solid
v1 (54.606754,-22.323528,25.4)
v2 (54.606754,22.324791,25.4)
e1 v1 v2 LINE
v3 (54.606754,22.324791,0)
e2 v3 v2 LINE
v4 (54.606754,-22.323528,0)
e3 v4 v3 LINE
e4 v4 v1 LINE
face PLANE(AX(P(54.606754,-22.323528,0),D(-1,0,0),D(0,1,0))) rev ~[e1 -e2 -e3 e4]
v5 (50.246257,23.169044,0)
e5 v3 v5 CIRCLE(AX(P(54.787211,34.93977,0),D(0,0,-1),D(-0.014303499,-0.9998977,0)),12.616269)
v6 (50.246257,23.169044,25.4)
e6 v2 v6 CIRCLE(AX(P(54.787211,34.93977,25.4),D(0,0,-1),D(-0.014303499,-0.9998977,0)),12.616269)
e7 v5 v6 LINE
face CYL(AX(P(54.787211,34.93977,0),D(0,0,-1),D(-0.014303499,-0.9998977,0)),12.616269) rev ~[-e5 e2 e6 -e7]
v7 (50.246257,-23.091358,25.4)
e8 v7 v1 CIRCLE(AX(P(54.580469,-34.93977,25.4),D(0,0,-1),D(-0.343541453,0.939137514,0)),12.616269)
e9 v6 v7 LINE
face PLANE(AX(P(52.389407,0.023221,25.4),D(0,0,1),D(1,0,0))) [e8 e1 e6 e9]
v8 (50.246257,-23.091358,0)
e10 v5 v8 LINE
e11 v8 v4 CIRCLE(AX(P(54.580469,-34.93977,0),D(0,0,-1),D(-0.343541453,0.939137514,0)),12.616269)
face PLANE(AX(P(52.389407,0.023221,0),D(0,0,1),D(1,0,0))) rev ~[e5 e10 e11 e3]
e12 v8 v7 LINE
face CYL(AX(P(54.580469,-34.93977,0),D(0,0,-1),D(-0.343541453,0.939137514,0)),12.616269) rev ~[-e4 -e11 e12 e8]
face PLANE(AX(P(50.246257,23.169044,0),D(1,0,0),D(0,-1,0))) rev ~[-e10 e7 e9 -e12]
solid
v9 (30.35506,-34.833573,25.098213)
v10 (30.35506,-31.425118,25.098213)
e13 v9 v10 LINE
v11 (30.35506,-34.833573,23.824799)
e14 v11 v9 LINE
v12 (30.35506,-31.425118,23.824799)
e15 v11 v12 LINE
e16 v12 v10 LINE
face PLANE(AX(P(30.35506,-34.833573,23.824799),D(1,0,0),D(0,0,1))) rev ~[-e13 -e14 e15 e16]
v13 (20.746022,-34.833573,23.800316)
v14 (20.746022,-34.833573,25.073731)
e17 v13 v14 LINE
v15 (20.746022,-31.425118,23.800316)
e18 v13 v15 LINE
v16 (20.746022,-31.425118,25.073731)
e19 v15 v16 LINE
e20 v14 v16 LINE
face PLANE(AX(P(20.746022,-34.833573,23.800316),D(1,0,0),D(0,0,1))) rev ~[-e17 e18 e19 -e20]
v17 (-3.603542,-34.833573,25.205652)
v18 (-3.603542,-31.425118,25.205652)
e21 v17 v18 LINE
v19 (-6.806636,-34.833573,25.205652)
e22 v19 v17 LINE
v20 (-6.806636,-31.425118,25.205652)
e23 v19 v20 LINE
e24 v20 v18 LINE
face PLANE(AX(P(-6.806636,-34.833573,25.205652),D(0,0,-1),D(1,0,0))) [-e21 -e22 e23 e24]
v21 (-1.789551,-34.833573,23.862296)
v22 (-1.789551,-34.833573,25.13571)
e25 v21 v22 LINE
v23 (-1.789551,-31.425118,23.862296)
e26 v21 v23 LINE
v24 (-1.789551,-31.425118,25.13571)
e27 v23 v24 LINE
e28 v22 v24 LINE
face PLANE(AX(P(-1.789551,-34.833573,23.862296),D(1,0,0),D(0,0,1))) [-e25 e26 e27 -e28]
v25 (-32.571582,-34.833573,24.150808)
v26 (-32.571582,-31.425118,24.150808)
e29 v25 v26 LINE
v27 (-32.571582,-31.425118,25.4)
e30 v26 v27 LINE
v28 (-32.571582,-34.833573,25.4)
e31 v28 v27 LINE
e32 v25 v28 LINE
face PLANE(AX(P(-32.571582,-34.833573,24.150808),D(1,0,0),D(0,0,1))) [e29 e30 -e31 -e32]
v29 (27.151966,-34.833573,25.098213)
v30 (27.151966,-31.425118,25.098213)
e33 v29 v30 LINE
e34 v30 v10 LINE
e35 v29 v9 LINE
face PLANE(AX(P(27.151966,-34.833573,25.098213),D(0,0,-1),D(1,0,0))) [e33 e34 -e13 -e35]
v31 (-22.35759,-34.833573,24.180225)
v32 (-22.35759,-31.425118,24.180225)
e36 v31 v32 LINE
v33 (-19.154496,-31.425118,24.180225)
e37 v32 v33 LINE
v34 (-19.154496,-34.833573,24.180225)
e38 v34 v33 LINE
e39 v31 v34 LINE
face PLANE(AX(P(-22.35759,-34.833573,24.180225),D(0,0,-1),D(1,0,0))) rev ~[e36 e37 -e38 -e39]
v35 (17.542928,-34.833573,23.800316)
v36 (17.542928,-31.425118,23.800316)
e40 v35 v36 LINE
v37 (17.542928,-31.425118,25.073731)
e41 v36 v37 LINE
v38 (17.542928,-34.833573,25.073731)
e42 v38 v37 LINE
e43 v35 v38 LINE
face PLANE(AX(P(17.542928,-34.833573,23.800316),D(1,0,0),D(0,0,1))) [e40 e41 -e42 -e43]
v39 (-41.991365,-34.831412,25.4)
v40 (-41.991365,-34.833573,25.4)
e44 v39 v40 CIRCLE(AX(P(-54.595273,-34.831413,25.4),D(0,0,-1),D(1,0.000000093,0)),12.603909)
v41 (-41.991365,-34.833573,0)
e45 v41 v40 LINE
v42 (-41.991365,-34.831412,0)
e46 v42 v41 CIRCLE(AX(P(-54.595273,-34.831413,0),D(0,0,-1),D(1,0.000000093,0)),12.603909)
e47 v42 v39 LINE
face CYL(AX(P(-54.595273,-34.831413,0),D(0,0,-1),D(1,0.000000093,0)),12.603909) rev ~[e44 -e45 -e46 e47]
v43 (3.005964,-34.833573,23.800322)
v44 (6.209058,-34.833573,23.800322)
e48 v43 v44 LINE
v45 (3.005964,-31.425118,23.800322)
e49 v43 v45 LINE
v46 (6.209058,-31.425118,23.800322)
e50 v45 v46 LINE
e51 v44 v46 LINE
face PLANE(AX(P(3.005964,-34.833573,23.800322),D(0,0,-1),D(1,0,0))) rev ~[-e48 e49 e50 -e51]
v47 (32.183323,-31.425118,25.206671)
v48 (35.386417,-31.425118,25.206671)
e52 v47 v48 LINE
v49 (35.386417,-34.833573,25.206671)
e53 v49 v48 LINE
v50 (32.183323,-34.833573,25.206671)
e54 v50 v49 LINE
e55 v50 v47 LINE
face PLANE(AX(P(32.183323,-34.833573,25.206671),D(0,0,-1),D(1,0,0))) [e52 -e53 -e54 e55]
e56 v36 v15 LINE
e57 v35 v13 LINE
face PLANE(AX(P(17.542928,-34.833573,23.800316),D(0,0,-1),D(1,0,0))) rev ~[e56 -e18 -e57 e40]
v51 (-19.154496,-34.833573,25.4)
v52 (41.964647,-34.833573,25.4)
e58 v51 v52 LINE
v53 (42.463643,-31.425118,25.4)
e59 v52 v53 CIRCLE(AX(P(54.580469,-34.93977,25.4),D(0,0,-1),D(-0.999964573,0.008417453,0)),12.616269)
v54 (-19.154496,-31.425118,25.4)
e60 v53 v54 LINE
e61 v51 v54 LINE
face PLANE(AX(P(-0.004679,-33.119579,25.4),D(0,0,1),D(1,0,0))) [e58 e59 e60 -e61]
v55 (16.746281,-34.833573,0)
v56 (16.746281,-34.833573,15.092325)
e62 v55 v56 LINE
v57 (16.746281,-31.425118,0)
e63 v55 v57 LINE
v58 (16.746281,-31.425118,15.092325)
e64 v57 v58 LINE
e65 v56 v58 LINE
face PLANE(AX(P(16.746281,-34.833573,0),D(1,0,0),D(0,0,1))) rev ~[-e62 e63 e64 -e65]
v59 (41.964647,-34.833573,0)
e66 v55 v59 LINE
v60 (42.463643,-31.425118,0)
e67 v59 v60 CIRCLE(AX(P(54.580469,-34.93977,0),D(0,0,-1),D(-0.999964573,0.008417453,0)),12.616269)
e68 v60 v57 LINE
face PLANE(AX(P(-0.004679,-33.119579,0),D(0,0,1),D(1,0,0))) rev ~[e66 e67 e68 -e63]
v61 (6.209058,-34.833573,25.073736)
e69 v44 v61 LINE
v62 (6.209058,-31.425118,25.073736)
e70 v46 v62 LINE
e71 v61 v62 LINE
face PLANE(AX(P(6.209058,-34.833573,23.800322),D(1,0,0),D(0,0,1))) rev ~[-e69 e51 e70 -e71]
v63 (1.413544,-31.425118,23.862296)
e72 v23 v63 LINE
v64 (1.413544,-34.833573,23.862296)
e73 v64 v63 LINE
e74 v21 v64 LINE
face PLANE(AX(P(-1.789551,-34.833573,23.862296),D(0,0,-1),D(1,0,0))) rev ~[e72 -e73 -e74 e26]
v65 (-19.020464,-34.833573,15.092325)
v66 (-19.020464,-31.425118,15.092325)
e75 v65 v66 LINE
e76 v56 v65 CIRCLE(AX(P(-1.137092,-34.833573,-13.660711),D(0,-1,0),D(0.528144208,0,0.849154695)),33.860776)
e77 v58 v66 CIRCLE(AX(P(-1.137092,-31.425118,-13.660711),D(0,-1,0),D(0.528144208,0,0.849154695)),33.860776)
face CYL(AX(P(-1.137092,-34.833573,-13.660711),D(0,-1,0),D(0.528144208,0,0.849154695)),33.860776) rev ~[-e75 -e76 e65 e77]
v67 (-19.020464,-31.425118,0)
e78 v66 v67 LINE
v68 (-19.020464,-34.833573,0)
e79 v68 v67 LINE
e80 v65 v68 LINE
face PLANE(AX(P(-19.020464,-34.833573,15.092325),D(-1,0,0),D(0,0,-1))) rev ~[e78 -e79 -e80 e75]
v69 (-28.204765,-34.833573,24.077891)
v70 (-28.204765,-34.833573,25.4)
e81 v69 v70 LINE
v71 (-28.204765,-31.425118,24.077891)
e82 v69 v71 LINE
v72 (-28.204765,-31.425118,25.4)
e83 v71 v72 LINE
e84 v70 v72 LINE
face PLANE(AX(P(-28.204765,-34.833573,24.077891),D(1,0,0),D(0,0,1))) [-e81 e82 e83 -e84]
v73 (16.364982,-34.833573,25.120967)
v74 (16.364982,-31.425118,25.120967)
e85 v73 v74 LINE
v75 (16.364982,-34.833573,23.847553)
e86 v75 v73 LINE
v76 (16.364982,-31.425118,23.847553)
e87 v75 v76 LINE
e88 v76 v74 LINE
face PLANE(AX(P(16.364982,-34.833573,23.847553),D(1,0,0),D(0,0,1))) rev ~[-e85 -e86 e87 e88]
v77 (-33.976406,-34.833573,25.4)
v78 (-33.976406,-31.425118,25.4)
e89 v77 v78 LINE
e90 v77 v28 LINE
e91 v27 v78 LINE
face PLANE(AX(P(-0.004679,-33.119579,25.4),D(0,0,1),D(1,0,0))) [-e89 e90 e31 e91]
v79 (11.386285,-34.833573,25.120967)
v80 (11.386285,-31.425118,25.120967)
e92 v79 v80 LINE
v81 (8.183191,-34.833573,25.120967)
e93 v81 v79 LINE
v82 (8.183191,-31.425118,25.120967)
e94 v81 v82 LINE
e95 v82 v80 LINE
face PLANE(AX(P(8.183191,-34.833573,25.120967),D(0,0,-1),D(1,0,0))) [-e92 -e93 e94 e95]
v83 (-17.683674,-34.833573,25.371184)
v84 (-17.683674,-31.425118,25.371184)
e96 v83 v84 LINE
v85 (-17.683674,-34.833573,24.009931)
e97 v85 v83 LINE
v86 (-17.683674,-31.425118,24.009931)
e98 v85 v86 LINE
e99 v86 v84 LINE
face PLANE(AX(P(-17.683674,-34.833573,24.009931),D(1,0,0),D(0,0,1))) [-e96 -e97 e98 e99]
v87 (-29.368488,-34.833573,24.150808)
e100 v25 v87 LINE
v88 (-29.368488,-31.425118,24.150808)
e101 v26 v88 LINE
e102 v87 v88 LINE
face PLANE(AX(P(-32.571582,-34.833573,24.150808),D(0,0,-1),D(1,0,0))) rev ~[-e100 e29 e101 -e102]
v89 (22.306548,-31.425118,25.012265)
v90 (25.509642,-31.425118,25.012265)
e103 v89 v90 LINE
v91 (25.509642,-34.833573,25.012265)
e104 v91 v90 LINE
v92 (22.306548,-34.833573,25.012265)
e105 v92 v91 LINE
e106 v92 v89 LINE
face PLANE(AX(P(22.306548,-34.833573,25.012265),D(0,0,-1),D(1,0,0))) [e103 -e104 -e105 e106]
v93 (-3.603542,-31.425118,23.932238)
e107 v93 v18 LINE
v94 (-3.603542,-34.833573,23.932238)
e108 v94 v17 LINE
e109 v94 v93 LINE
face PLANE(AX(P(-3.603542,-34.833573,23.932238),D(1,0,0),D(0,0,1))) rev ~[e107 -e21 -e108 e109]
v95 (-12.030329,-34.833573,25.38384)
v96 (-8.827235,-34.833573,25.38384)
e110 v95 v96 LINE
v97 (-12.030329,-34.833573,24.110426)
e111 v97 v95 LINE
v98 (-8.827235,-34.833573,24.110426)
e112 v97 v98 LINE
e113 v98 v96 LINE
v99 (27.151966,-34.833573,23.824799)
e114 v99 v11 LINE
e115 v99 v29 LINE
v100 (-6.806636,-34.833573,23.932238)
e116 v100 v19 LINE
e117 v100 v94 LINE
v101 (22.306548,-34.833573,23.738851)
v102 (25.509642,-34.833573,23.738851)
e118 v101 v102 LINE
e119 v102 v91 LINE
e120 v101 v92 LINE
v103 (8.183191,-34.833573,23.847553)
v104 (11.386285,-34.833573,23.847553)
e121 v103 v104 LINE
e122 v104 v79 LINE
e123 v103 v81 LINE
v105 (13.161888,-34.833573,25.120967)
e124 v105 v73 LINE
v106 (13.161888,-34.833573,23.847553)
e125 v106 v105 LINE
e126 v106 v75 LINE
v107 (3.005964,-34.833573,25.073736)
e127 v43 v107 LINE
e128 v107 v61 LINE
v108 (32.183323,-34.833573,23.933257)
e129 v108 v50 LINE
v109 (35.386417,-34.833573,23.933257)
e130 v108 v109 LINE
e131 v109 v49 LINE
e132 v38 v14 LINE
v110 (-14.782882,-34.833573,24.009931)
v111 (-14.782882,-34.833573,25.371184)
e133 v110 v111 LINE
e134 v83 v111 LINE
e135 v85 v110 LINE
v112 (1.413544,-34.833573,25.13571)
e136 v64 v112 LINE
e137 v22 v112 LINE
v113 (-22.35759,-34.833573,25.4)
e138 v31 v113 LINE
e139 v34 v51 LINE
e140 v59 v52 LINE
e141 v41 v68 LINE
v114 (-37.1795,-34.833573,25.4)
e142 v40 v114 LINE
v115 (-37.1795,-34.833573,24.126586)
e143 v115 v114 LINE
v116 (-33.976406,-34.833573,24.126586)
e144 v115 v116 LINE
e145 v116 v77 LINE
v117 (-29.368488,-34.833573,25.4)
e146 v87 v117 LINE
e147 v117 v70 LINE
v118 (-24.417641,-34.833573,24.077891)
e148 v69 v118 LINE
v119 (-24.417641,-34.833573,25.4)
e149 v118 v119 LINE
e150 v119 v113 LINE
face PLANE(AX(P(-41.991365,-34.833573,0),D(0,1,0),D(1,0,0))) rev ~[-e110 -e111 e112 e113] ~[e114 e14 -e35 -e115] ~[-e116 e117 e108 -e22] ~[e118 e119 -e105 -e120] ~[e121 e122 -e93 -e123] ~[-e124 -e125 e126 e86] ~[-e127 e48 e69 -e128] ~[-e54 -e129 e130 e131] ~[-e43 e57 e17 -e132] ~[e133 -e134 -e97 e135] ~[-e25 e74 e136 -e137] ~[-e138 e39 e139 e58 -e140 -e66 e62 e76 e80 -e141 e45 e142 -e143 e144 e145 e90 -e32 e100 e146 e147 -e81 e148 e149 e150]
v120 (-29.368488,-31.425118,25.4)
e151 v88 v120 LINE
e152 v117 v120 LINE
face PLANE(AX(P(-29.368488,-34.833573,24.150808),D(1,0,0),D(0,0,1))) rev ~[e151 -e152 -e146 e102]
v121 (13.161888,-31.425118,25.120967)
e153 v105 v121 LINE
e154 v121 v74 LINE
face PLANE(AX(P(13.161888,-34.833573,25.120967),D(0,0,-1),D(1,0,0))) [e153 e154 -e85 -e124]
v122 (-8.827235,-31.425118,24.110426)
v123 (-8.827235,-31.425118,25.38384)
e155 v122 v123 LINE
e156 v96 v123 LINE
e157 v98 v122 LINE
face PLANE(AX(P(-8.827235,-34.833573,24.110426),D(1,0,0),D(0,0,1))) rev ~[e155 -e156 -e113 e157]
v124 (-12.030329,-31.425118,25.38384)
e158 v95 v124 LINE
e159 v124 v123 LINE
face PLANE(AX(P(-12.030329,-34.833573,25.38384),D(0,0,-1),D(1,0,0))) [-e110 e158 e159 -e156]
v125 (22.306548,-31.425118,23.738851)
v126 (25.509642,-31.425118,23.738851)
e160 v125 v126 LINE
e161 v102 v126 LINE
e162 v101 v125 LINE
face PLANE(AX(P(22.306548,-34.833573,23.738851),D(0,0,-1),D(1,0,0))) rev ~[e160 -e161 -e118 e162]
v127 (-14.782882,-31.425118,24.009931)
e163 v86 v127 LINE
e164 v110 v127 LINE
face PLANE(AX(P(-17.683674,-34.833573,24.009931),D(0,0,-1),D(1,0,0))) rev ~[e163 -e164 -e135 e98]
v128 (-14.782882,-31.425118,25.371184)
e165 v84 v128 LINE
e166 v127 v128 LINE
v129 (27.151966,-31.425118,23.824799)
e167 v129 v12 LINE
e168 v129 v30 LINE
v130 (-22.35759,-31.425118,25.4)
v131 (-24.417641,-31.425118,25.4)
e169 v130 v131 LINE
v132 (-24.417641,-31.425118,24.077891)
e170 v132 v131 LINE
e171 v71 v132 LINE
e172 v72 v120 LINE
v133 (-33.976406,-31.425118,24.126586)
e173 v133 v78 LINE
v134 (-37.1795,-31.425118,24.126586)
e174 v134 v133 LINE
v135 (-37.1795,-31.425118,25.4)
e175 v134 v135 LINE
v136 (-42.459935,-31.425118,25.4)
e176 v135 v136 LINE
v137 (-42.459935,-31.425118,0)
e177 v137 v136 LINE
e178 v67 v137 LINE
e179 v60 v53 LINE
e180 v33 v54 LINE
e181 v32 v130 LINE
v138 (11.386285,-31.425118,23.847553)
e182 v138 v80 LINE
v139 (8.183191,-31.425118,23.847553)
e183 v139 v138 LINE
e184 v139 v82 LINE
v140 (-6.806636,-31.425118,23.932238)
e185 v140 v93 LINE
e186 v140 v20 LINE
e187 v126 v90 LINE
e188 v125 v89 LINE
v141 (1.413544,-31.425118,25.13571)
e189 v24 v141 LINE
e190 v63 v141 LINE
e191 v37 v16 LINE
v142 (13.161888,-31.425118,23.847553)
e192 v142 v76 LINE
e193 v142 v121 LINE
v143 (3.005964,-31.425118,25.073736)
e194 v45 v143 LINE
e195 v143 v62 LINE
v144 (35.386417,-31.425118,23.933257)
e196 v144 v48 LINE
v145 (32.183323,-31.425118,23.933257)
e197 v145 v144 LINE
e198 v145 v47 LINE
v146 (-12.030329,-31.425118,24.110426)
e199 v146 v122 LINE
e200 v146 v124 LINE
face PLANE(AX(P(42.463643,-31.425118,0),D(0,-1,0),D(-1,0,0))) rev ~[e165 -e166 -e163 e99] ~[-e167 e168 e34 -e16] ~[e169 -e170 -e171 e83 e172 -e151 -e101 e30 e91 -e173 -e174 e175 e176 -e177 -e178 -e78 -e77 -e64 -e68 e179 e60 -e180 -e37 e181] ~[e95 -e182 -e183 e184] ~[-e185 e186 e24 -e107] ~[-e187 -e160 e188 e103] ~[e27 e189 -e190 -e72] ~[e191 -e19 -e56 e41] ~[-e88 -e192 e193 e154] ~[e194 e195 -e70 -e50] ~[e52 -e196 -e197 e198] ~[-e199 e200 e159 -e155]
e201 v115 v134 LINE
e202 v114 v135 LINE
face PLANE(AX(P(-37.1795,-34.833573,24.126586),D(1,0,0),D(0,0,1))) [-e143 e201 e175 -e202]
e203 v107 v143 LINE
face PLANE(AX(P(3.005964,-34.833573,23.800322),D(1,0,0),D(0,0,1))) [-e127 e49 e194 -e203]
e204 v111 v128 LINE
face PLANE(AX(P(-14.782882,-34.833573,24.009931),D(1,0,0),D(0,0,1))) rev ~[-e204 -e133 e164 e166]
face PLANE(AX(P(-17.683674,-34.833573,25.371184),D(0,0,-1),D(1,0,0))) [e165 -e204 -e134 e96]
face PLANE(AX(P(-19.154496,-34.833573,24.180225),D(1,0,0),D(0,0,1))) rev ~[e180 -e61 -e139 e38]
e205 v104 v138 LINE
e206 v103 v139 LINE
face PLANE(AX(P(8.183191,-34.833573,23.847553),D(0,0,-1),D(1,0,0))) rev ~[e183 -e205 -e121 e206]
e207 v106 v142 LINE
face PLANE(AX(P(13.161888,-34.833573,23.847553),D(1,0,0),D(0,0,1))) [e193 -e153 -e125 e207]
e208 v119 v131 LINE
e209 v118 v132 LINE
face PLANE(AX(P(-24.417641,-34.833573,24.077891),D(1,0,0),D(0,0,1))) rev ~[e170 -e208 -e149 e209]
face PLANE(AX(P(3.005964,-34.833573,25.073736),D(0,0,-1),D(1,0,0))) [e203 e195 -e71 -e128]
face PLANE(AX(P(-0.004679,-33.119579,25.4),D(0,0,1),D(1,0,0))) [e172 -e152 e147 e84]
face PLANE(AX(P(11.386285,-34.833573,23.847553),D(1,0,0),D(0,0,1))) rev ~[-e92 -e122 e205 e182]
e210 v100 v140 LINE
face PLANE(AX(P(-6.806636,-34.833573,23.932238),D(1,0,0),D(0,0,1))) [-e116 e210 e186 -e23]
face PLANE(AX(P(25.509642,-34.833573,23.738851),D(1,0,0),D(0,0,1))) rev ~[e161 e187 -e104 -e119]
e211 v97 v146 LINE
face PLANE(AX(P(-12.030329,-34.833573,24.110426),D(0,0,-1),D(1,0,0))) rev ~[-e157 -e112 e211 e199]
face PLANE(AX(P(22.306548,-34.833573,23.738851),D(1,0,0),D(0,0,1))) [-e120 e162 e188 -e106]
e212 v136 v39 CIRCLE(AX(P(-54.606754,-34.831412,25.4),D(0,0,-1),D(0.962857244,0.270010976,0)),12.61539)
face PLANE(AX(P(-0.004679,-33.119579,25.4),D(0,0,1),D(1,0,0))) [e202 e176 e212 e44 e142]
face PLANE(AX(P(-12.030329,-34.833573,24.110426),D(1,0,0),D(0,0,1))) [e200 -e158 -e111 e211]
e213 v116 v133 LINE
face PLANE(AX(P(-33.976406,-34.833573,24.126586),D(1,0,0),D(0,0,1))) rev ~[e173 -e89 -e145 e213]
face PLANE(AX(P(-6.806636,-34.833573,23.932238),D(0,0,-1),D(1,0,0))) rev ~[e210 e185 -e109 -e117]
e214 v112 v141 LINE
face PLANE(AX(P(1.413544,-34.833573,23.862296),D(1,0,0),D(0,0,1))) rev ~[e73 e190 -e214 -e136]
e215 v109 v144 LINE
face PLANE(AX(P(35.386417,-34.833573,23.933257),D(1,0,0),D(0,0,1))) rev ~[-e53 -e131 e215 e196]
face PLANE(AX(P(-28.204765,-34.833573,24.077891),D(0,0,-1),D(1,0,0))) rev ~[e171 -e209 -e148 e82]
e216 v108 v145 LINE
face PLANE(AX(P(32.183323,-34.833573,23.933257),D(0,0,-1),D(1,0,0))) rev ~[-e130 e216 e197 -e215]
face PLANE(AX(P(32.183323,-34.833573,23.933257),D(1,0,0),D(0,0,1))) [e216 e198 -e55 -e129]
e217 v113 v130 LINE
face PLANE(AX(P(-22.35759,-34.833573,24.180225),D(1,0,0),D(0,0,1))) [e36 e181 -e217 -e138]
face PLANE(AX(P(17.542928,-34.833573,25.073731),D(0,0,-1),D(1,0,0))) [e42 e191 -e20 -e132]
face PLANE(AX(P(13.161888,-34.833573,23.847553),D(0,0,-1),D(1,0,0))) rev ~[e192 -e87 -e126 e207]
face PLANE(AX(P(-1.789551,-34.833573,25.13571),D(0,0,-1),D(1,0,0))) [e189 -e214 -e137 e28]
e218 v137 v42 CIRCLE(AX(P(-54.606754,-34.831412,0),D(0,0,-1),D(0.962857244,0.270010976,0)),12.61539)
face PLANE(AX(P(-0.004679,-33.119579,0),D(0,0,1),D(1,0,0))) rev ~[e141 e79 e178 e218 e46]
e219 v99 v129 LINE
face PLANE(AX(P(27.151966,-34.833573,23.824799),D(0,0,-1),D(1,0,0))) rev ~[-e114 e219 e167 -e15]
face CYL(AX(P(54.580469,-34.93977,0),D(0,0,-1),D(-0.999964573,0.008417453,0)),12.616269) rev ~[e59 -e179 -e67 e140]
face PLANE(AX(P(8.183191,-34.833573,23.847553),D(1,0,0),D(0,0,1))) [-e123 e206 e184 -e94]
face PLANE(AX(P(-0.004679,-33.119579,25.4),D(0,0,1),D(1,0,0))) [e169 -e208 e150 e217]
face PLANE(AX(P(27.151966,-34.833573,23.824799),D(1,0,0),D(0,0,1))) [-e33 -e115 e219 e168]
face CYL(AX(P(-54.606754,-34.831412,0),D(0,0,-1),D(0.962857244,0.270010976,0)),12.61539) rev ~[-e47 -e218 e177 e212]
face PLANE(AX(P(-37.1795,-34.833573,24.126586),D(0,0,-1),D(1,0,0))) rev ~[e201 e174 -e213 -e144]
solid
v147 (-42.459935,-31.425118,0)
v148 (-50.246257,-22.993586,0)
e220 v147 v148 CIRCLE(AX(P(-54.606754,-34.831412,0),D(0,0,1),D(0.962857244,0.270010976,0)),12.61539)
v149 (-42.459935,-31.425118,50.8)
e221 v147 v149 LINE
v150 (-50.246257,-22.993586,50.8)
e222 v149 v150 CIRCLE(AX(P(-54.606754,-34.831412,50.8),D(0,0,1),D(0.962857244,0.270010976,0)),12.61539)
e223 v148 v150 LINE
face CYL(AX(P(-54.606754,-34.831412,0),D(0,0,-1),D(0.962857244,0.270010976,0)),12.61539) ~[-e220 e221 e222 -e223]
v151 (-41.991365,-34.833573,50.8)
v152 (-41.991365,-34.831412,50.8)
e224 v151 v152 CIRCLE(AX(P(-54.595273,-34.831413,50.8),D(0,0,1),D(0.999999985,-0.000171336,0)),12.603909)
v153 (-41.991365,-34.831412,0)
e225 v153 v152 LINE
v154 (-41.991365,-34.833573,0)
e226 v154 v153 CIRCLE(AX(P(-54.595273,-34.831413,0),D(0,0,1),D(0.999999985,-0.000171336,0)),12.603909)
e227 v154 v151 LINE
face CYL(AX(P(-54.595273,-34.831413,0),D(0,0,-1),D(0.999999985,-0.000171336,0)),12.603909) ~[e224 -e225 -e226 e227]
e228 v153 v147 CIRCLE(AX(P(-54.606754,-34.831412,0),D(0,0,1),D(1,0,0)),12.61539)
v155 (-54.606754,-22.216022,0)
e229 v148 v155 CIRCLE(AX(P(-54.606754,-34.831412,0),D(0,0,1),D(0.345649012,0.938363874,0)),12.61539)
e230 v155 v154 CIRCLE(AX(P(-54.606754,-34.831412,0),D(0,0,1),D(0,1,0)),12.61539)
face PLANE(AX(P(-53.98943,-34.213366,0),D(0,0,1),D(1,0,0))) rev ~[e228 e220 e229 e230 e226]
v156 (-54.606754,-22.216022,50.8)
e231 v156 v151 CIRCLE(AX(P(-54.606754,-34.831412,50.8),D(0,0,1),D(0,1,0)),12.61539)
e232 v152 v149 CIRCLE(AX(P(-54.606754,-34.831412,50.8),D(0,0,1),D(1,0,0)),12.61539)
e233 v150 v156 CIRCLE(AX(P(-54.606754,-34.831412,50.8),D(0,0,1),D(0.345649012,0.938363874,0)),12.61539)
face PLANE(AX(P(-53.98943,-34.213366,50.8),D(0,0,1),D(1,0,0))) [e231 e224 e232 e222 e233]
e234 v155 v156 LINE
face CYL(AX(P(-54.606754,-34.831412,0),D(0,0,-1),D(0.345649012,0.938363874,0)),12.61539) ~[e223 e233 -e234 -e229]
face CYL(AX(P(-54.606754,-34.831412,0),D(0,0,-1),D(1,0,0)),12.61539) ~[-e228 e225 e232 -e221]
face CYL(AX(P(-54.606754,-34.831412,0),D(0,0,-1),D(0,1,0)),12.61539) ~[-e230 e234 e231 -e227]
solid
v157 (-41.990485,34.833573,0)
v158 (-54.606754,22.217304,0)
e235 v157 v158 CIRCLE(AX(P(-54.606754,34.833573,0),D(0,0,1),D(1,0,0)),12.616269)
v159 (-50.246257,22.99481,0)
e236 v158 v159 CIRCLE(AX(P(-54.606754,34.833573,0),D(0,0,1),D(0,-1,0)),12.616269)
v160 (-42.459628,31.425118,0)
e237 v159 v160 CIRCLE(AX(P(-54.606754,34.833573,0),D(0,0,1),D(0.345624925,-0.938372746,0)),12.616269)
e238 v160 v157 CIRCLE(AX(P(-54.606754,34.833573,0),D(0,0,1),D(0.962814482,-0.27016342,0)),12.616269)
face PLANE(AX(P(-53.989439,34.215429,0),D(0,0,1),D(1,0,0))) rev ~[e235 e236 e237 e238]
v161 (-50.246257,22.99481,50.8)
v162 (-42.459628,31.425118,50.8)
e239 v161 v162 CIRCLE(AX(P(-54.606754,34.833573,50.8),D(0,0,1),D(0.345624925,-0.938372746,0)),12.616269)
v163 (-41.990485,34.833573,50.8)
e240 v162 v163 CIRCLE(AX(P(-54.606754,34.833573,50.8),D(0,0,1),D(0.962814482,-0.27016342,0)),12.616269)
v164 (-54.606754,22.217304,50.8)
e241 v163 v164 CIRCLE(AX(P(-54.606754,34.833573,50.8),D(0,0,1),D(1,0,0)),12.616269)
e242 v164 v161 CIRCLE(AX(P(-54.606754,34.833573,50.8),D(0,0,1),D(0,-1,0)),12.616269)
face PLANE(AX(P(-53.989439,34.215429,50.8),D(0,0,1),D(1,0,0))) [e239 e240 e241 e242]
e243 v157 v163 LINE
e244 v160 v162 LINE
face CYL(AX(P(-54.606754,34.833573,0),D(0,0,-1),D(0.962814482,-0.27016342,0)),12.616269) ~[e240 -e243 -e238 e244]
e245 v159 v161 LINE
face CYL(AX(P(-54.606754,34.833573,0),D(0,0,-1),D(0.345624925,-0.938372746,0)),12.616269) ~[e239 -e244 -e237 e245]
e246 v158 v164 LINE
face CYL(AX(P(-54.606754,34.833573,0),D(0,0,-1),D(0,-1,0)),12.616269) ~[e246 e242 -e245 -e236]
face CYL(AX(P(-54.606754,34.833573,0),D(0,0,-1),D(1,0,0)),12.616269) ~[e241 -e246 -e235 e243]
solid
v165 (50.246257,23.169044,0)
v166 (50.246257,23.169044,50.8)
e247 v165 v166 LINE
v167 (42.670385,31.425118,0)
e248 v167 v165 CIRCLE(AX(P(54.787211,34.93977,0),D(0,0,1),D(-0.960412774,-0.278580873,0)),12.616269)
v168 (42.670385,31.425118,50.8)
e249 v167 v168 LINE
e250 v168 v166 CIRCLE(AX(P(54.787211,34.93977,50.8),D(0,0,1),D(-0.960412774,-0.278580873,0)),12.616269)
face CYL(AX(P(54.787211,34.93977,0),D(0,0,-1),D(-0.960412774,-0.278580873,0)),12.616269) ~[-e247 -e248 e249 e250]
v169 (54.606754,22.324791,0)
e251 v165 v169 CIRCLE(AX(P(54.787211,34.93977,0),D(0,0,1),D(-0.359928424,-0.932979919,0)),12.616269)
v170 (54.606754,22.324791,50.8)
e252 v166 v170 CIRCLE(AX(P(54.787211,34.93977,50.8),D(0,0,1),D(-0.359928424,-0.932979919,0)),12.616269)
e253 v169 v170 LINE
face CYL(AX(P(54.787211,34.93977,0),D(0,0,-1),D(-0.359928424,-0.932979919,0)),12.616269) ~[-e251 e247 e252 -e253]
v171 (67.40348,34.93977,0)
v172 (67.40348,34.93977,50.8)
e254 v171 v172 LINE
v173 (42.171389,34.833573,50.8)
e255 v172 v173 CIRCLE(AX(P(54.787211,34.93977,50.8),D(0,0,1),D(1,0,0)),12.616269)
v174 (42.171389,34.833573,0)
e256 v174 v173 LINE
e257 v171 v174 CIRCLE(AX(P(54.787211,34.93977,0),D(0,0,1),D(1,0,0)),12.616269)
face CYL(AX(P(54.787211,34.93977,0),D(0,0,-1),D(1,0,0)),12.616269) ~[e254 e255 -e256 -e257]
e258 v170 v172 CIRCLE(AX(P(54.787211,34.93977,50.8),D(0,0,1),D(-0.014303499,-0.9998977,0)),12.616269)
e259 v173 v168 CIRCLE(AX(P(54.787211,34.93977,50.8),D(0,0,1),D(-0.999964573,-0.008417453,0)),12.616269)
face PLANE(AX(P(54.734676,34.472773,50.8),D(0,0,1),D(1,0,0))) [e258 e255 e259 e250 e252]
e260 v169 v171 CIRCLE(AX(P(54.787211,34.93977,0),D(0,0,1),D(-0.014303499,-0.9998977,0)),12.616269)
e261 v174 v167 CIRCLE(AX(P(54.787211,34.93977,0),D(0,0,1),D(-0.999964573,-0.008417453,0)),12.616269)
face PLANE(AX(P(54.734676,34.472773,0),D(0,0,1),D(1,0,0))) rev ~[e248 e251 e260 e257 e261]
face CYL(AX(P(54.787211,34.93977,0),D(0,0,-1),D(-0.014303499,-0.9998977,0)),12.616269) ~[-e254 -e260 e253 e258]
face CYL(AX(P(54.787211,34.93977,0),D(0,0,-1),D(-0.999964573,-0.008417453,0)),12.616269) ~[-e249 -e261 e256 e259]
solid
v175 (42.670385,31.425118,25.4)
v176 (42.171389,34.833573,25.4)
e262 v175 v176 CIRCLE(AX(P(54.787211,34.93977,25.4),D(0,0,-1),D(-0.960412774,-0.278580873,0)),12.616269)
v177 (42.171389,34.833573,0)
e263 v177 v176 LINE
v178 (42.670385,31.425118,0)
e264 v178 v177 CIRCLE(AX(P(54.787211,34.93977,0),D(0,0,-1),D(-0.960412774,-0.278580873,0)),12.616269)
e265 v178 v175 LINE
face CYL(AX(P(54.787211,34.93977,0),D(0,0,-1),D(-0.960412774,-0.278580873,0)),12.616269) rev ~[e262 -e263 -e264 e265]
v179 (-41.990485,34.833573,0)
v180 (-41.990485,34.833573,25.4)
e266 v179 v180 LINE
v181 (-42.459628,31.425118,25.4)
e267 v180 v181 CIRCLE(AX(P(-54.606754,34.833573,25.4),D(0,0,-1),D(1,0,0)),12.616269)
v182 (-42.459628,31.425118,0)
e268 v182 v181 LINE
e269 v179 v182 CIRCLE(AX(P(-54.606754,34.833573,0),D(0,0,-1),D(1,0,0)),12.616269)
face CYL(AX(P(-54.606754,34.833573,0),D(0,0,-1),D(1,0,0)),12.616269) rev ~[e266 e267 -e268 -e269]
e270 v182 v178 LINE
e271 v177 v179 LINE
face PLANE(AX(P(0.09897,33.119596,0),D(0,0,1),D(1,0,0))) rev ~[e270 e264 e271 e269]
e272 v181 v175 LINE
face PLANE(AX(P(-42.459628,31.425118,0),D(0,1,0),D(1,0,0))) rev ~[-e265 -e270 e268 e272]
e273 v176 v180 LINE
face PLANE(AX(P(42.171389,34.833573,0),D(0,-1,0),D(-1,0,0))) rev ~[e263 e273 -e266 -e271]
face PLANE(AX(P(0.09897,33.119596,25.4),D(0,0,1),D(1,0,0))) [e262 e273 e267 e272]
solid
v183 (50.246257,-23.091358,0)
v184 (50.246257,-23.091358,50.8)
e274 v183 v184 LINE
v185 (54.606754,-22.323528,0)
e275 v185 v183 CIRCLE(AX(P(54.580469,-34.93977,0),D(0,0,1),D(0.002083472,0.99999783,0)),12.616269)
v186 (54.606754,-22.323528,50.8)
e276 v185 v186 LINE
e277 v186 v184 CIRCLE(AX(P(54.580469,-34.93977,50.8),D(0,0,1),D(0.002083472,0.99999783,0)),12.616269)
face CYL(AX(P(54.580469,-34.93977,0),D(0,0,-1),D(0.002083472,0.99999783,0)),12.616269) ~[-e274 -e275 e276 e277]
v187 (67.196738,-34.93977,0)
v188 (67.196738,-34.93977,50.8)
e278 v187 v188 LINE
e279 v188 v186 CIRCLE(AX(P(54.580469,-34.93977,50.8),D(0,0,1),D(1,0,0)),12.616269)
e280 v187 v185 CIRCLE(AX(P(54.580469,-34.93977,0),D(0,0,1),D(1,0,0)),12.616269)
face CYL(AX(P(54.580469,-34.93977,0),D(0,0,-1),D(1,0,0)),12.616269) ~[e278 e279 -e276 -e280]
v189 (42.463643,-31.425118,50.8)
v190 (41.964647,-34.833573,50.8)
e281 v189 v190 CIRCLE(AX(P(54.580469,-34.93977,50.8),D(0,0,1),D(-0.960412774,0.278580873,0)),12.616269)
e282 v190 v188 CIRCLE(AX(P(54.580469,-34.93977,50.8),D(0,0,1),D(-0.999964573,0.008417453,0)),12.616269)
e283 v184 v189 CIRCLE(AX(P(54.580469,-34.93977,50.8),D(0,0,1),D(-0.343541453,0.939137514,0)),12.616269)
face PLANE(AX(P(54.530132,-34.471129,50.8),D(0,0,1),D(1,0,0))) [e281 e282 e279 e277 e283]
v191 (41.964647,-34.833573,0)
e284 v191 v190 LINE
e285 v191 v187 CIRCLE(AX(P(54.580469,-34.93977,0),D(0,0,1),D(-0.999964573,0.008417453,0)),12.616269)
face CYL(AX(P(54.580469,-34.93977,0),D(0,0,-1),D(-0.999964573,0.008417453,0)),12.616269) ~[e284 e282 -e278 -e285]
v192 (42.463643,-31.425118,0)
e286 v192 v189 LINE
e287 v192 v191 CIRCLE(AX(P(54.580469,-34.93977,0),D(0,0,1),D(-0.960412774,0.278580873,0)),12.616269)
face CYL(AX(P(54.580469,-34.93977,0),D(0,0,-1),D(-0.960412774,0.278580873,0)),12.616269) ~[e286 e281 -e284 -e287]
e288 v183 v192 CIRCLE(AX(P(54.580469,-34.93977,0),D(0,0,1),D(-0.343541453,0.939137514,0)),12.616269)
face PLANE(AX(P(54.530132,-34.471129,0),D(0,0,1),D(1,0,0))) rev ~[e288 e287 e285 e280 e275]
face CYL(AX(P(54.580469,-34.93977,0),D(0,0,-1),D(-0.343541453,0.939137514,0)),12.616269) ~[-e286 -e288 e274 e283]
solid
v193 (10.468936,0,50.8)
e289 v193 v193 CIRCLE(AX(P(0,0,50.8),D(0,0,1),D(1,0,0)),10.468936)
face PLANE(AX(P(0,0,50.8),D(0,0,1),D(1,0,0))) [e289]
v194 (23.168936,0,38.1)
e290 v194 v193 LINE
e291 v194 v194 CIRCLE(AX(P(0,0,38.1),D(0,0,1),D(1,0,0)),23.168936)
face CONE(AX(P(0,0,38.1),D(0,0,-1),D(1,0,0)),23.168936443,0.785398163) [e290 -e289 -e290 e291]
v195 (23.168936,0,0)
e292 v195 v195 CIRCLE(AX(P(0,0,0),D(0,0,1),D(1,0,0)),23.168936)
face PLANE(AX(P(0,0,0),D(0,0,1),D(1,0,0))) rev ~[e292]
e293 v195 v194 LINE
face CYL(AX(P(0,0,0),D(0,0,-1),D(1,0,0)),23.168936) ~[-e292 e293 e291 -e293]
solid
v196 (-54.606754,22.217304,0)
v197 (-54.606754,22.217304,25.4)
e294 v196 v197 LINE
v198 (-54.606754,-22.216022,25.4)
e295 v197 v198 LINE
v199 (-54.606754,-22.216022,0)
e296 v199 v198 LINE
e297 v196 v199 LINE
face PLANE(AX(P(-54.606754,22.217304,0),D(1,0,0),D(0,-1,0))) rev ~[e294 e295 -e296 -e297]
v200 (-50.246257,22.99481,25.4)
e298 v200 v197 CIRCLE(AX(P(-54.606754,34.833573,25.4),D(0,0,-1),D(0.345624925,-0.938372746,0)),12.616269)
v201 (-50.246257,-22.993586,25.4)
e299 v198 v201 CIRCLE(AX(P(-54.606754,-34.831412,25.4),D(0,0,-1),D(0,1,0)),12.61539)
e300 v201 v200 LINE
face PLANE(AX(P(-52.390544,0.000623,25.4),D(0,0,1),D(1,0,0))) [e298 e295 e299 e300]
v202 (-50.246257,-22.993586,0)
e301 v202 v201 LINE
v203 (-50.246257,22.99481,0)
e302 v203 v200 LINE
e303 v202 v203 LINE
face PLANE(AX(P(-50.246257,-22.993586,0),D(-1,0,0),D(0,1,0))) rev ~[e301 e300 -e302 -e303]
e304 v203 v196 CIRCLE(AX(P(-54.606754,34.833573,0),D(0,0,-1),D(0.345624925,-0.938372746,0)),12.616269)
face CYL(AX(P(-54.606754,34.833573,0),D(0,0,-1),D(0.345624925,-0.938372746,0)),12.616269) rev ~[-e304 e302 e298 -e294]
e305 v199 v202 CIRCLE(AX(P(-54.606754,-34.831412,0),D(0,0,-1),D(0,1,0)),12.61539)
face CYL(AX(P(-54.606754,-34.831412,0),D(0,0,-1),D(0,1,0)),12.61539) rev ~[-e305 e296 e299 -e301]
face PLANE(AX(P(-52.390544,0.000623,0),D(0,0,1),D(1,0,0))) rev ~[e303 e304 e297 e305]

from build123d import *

# Parameters (mm, degrees)
F1_DEPTH   = 25.4
F2_DEPTH   = 50.8
F0_R       = 23.1689364428
F4_DEPTH   = 14.986
F5_W       = 3.2030940056
F5_H       = 1.273414427
F5_H_2     = 1.2491918117
F5_W_2     = 3.7871245295
F5_H_3     = 1.3221087813
F5_H_4     = 1.2197750568
F5_W_3     = 2.9007913545
F5_H_5     = 1.361253047
F1_FACE1_W = 85.1300132265
F1_FACE1_H = 25.4
F1_FACE2_W = 84.1618746061
F1_FACE2_H = 25.4
F6_DEPTH   = 7.112
F7_SIZE    = 12.7


with BuildPart() as f1:
    # F0 (on Top) → F1 (new body)
    with BuildSketch(Plane.XY):
        with BuildLine():
            Line((42.1713891774, 34.8335728049), (-41.9904854287, 34.8335728049))
            ThreePointArc((-41.9904854287, 34.8335728049), (-42.1083213465, 33.1132780775), (-42.4596279258, 31.4251184464))
            Line((-42.4596279258, 31.4251184464), (42.6703853007, 31.4251184464))
            ThreePointArc((42.6703853007, 31.4251184464), (42.3040081413, 33.1122345804), (42.1713891774, 34.8335728049))
        make_face()
    extrude(amount=F1_DEPTH)


with BuildPart() as f1b:
    # F0 (on Top) → F1, piece 2 (new body)
    with BuildSketch(Plane.XY):
        with BuildLine():
            Line((-54.6067543328, 22.2173039008), (-54.6067543328, -22.2160224009))
            ThreePointArc((-54.6067543328, -22.2160224009), (-52.3921133094, -22.4119345582), (-50.2462573349, -22.9935861489))
            Line((-50.2462573349, -22.9935861489), (-50.2462573349, 22.9948099053))
            ThreePointArc((-50.2462573349, 22.9948099053), (-52.3921183776, 22.4132012868), (-54.6067543328, 22.2173039008))
        make_face()
    extrude(amount=F1_DEPTH)


with BuildPart() as f1c:
    # F0 (on Top) → F1, piece 3 (new body)
    with BuildSketch(Plane.XY):
        with BuildLine():
            Line((-41.9913647822, -34.8335728049), (41.9646467417, -34.8335728049))
            ThreePointArc((41.9646467417, -34.8335728049), (42.0972657056, -33.1122345804), (42.463642865, -31.4251184464))
            Line((42.463642865, -31.4251184464), (-42.4599349352, -31.4251184464))
            ThreePointArc((-42.4599349352, -31.4251184464), (-42.1090561661, -33.112226656), (-41.9913645972, -34.8314121366))
            ThreePointArc((-41.9913645972, -34.8314121366), (-41.9913646434, -34.8324924707), (-41.9913647822, -34.8335728049))
        make_face()
    extrude(amount=F1_DEPTH)

    # F3 (on face) → F4 (cut)
    with BuildSketch(Plane.XZ.offset(34.8335728049)):
        with BuildLine():
            Line((-19.0204642713, 15.0923253968), (-19.0204642713, 0))
            Line((-19.0204642713, 0), (16.7462807149, 0))
            Line((16.7462807149, 0), (16.7462807149, 15.0923253968))
            ThreePointArc((16.7462807149, 15.0923253968), (-1.1370917782, 20.2000644219), (-19.0204642713, 15.0923253968))
        make_face()
    extrude(amount=-F4_DEPTH, mode=Mode.SUBTRACT)

    # F5 (on face) + F1_face1 (on face) + F1_face2 (on face) → F6 (cut)
    with BuildSketch(Plane.XZ.offset(34.8335728049)):
        with Locations((-35.5779528618, 24.7632927865)):
            Rectangle(F5_W, F5_H)
        with Locations((-30.9700351208, 24.7754040942)):
            Rectangle(F5_W, F5_H_2)
        with Locations((-26.3112029061, 24.7389456093)):
            Rectangle(F5_W_2, F5_H_3)
        with Locations((-20.7560434937, 24.7901124716)):
            Rectangle(F5_W, F5_H_4)
        with Locations((-16.2332779728, 24.6905572712)):
            Rectangle(F5_W_3, F5_H_5)
        with Locations((-10.4287816212, 24.747133255)):
            Rectangle(F5_W, F5_H)
        with Locations((-5.2050889935, 24.5689451694)):
            Rectangle(F5_W, F5_H)
        with Locations((-0.1880034979, 24.4990028441)):
            Rectangle(F5_W, F5_H)
        with Locations((4.6075105201, 24.4370289147)):
            Rectangle(F5_W, F5_H)
        with Locations((9.7847376019, 24.4842600077)):
            Rectangle(F5_W, F5_H)
        with Locations((14.7634353489, 24.4842600077)):
            Rectangle(F5_W, F5_H)
        with Locations((19.1444754601, 24.4370233268)):
            Rectangle(F5_W, F5_H)
        with Locations((23.9080954343, 24.3755578995)):
            Rectangle(F5_W, F5_H)
        with Locations((28.7535134703, 24.4615059346)):
            Rectangle(F5_W, F5_H)
        with Locations((33.7848700583, 24.5699640363)):
            Rectangle(F5_W, F5_H)
    with BuildSketch(Plane(origin=(0.1053786874, 31.4251184464, 12.7), x_dir=(1, 0, 0), z_dir=(0, -1, 0))):
        Rectangle(F1_FACE1_W, F1_FACE1_H)
    with BuildSketch(Plane(origin=(0.0904518744, 34.8335728049, 12.7), x_dir=(-1, 0, 0), z_dir=(0, 1, 0))):
        Rectangle(F1_FACE2_W, F1_FACE2_H)
    extrude(amount=-F6_DEPTH, dir=(0, -1, 0), mode=Mode.SUBTRACT)


with BuildPart() as f1d:
    # F0 (on Top) → F1, piece 4 (new body)
    with BuildSketch(Plane.XY):
        with BuildLine():
            Line((50.2462573349, 23.1690441136), (50.2462573349, -23.0913582413))
            ThreePointArc((50.2462573349, -23.0913582413), (52.3925594701, -22.5146622382), (54.6067543328, -22.3235281341))
            Line((54.6067543328, -22.3235281341), (54.6067543328, 22.3247913991))
            ThreePointArc((54.6067543328, 22.3247913991), (52.3890618107, 22.553522405), (50.2462573349, 23.1690441136))
        make_face()
    extrude(amount=F1_DEPTH)


with BuildPart() as f2:
    # F0 (on Top) → F2 (new body)
    with BuildSketch(Plane.XY):
        with BuildLine():
            ThreePointArc((-41.9904854287, 34.8335728049), (-63.5278036282, 43.7546221003), (-54.6067543328, 22.2173039008))
            ThreePointArc((-54.6067543328, 22.2173039008), (-52.3921183776, 22.4132012868), (-50.2462573349, 22.9948099053))
            ThreePointArc((-50.2462573349, 22.9948099053), (-45.3389102932, 26.2733562237), (-42.4596279258, 31.4251184464))
            ThreePointArc((-42.4596279258, 31.4251184464), (-42.1083213465, 33.1132780775), (-41.9904854287, 34.8335728049))
        make_face()
    extrude(amount=F2_DEPTH)


with BuildPart() as f2b:
    # F0 (on Top) → F2, piece 2 (new body)
    with BuildSketch(Plane.XY):
        with BuildLine():
            ThreePointArc((42.6703853007, 31.4251184464), (45.4914542286, 26.4098725356), (50.2462573349, 23.1690441136))
            ThreePointArc((50.2462573349, 23.1690441136), (52.3890618107, 22.553522405), (54.6067543328, 22.3247913991))
            ThreePointArc((54.6067543328, 22.3247913991), (63.6442295153, 25.9551457787), (67.4034800242, 34.9397696555))
            ThreePointArc((67.4034800242, 34.9397696555), (54.7341122246, 47.5559268187), (42.1713891774, 34.8335728049))
            ThreePointArc((42.1713891774, 34.8335728049), (42.3040081413, 33.1122345804), (42.6703853007, 31.4251184464))
        make_face()
    extrude(amount=F2_DEPTH)


with BuildPart() as f2c:
    # F0 (on Top) → F2, piece 3 (new body)
    with BuildSketch(Plane.XY):
        with BuildLine():
            ThreePointArc((42.463642865, -31.4251184464), (42.0972657056, -33.1122345804), (41.9646467417, -34.8335728049))
            ThreePointArc((41.9646467417, -34.8335728049), (54.5273697889, -47.5559268187), (67.1967375885, -34.9397696555))
            ThreePointArc((67.1967375885, -34.9397696555), (63.5108065243, -26.0280185859), (54.6067543328, -22.3235281341))
            ThreePointArc((54.6067543328, -22.3235281341), (52.3925594701, -22.5146622382), (50.2462573349, -23.0913582413))
            ThreePointArc((50.2462573349, -23.0913582413), (45.3597287048, -26.3288350204), (42.463642865, -31.4251184464))
        make_face()
    extrude(amount=F2_DEPTH)


with BuildPart() as f2d:
    # F0 (on Top) → F2, piece 4 (new body)
    with BuildSketch(Plane.XY):
        with BuildLine():
            ThreePointArc((-54.6067543328, -22.2160224009), (-63.5279458411, -43.7510758216), (-41.9913647822, -34.8335728049))
            ThreePointArc((-41.9913647822, -34.8335728049), (-41.9913646434, -34.8324924707), (-41.9913645972, -34.8314121366))
            ThreePointArc((-41.9913645972, -34.8314121366), (-42.1090561661, -33.112226656), (-42.4599349352, -31.4251184464))
            ThreePointArc((-42.4599349352, -31.4251184464), (-45.3387686905, -26.2726446835), (-50.2462573349, -22.9935861489))
            ThreePointArc((-50.2462573349, -22.9935861489), (-52.3921133094, -22.4119345582), (-54.6067543328, -22.2160224009))
        make_face()
    extrude(amount=F2_DEPTH)


with BuildPart() as f2e:
    # F0 (on Top) → F2, piece 5 (new body)
    with BuildSketch(Plane.XY):
        Circle(F0_R)
    extrude(amount=F2_DEPTH)

    # F7
    f7_edges = [f2e.edges().sort_by_distance(p)[0] for p in [
        (-23.168936, 0, 50.8),
    ]]
    chamfer(f7_edges, length=F7_SIZE)


solid = Compound([f1.part, f1b.part, f1c.part, f1d.part, f2.part, f2b.part, f2c.part, f2d.part, f2e.part])
